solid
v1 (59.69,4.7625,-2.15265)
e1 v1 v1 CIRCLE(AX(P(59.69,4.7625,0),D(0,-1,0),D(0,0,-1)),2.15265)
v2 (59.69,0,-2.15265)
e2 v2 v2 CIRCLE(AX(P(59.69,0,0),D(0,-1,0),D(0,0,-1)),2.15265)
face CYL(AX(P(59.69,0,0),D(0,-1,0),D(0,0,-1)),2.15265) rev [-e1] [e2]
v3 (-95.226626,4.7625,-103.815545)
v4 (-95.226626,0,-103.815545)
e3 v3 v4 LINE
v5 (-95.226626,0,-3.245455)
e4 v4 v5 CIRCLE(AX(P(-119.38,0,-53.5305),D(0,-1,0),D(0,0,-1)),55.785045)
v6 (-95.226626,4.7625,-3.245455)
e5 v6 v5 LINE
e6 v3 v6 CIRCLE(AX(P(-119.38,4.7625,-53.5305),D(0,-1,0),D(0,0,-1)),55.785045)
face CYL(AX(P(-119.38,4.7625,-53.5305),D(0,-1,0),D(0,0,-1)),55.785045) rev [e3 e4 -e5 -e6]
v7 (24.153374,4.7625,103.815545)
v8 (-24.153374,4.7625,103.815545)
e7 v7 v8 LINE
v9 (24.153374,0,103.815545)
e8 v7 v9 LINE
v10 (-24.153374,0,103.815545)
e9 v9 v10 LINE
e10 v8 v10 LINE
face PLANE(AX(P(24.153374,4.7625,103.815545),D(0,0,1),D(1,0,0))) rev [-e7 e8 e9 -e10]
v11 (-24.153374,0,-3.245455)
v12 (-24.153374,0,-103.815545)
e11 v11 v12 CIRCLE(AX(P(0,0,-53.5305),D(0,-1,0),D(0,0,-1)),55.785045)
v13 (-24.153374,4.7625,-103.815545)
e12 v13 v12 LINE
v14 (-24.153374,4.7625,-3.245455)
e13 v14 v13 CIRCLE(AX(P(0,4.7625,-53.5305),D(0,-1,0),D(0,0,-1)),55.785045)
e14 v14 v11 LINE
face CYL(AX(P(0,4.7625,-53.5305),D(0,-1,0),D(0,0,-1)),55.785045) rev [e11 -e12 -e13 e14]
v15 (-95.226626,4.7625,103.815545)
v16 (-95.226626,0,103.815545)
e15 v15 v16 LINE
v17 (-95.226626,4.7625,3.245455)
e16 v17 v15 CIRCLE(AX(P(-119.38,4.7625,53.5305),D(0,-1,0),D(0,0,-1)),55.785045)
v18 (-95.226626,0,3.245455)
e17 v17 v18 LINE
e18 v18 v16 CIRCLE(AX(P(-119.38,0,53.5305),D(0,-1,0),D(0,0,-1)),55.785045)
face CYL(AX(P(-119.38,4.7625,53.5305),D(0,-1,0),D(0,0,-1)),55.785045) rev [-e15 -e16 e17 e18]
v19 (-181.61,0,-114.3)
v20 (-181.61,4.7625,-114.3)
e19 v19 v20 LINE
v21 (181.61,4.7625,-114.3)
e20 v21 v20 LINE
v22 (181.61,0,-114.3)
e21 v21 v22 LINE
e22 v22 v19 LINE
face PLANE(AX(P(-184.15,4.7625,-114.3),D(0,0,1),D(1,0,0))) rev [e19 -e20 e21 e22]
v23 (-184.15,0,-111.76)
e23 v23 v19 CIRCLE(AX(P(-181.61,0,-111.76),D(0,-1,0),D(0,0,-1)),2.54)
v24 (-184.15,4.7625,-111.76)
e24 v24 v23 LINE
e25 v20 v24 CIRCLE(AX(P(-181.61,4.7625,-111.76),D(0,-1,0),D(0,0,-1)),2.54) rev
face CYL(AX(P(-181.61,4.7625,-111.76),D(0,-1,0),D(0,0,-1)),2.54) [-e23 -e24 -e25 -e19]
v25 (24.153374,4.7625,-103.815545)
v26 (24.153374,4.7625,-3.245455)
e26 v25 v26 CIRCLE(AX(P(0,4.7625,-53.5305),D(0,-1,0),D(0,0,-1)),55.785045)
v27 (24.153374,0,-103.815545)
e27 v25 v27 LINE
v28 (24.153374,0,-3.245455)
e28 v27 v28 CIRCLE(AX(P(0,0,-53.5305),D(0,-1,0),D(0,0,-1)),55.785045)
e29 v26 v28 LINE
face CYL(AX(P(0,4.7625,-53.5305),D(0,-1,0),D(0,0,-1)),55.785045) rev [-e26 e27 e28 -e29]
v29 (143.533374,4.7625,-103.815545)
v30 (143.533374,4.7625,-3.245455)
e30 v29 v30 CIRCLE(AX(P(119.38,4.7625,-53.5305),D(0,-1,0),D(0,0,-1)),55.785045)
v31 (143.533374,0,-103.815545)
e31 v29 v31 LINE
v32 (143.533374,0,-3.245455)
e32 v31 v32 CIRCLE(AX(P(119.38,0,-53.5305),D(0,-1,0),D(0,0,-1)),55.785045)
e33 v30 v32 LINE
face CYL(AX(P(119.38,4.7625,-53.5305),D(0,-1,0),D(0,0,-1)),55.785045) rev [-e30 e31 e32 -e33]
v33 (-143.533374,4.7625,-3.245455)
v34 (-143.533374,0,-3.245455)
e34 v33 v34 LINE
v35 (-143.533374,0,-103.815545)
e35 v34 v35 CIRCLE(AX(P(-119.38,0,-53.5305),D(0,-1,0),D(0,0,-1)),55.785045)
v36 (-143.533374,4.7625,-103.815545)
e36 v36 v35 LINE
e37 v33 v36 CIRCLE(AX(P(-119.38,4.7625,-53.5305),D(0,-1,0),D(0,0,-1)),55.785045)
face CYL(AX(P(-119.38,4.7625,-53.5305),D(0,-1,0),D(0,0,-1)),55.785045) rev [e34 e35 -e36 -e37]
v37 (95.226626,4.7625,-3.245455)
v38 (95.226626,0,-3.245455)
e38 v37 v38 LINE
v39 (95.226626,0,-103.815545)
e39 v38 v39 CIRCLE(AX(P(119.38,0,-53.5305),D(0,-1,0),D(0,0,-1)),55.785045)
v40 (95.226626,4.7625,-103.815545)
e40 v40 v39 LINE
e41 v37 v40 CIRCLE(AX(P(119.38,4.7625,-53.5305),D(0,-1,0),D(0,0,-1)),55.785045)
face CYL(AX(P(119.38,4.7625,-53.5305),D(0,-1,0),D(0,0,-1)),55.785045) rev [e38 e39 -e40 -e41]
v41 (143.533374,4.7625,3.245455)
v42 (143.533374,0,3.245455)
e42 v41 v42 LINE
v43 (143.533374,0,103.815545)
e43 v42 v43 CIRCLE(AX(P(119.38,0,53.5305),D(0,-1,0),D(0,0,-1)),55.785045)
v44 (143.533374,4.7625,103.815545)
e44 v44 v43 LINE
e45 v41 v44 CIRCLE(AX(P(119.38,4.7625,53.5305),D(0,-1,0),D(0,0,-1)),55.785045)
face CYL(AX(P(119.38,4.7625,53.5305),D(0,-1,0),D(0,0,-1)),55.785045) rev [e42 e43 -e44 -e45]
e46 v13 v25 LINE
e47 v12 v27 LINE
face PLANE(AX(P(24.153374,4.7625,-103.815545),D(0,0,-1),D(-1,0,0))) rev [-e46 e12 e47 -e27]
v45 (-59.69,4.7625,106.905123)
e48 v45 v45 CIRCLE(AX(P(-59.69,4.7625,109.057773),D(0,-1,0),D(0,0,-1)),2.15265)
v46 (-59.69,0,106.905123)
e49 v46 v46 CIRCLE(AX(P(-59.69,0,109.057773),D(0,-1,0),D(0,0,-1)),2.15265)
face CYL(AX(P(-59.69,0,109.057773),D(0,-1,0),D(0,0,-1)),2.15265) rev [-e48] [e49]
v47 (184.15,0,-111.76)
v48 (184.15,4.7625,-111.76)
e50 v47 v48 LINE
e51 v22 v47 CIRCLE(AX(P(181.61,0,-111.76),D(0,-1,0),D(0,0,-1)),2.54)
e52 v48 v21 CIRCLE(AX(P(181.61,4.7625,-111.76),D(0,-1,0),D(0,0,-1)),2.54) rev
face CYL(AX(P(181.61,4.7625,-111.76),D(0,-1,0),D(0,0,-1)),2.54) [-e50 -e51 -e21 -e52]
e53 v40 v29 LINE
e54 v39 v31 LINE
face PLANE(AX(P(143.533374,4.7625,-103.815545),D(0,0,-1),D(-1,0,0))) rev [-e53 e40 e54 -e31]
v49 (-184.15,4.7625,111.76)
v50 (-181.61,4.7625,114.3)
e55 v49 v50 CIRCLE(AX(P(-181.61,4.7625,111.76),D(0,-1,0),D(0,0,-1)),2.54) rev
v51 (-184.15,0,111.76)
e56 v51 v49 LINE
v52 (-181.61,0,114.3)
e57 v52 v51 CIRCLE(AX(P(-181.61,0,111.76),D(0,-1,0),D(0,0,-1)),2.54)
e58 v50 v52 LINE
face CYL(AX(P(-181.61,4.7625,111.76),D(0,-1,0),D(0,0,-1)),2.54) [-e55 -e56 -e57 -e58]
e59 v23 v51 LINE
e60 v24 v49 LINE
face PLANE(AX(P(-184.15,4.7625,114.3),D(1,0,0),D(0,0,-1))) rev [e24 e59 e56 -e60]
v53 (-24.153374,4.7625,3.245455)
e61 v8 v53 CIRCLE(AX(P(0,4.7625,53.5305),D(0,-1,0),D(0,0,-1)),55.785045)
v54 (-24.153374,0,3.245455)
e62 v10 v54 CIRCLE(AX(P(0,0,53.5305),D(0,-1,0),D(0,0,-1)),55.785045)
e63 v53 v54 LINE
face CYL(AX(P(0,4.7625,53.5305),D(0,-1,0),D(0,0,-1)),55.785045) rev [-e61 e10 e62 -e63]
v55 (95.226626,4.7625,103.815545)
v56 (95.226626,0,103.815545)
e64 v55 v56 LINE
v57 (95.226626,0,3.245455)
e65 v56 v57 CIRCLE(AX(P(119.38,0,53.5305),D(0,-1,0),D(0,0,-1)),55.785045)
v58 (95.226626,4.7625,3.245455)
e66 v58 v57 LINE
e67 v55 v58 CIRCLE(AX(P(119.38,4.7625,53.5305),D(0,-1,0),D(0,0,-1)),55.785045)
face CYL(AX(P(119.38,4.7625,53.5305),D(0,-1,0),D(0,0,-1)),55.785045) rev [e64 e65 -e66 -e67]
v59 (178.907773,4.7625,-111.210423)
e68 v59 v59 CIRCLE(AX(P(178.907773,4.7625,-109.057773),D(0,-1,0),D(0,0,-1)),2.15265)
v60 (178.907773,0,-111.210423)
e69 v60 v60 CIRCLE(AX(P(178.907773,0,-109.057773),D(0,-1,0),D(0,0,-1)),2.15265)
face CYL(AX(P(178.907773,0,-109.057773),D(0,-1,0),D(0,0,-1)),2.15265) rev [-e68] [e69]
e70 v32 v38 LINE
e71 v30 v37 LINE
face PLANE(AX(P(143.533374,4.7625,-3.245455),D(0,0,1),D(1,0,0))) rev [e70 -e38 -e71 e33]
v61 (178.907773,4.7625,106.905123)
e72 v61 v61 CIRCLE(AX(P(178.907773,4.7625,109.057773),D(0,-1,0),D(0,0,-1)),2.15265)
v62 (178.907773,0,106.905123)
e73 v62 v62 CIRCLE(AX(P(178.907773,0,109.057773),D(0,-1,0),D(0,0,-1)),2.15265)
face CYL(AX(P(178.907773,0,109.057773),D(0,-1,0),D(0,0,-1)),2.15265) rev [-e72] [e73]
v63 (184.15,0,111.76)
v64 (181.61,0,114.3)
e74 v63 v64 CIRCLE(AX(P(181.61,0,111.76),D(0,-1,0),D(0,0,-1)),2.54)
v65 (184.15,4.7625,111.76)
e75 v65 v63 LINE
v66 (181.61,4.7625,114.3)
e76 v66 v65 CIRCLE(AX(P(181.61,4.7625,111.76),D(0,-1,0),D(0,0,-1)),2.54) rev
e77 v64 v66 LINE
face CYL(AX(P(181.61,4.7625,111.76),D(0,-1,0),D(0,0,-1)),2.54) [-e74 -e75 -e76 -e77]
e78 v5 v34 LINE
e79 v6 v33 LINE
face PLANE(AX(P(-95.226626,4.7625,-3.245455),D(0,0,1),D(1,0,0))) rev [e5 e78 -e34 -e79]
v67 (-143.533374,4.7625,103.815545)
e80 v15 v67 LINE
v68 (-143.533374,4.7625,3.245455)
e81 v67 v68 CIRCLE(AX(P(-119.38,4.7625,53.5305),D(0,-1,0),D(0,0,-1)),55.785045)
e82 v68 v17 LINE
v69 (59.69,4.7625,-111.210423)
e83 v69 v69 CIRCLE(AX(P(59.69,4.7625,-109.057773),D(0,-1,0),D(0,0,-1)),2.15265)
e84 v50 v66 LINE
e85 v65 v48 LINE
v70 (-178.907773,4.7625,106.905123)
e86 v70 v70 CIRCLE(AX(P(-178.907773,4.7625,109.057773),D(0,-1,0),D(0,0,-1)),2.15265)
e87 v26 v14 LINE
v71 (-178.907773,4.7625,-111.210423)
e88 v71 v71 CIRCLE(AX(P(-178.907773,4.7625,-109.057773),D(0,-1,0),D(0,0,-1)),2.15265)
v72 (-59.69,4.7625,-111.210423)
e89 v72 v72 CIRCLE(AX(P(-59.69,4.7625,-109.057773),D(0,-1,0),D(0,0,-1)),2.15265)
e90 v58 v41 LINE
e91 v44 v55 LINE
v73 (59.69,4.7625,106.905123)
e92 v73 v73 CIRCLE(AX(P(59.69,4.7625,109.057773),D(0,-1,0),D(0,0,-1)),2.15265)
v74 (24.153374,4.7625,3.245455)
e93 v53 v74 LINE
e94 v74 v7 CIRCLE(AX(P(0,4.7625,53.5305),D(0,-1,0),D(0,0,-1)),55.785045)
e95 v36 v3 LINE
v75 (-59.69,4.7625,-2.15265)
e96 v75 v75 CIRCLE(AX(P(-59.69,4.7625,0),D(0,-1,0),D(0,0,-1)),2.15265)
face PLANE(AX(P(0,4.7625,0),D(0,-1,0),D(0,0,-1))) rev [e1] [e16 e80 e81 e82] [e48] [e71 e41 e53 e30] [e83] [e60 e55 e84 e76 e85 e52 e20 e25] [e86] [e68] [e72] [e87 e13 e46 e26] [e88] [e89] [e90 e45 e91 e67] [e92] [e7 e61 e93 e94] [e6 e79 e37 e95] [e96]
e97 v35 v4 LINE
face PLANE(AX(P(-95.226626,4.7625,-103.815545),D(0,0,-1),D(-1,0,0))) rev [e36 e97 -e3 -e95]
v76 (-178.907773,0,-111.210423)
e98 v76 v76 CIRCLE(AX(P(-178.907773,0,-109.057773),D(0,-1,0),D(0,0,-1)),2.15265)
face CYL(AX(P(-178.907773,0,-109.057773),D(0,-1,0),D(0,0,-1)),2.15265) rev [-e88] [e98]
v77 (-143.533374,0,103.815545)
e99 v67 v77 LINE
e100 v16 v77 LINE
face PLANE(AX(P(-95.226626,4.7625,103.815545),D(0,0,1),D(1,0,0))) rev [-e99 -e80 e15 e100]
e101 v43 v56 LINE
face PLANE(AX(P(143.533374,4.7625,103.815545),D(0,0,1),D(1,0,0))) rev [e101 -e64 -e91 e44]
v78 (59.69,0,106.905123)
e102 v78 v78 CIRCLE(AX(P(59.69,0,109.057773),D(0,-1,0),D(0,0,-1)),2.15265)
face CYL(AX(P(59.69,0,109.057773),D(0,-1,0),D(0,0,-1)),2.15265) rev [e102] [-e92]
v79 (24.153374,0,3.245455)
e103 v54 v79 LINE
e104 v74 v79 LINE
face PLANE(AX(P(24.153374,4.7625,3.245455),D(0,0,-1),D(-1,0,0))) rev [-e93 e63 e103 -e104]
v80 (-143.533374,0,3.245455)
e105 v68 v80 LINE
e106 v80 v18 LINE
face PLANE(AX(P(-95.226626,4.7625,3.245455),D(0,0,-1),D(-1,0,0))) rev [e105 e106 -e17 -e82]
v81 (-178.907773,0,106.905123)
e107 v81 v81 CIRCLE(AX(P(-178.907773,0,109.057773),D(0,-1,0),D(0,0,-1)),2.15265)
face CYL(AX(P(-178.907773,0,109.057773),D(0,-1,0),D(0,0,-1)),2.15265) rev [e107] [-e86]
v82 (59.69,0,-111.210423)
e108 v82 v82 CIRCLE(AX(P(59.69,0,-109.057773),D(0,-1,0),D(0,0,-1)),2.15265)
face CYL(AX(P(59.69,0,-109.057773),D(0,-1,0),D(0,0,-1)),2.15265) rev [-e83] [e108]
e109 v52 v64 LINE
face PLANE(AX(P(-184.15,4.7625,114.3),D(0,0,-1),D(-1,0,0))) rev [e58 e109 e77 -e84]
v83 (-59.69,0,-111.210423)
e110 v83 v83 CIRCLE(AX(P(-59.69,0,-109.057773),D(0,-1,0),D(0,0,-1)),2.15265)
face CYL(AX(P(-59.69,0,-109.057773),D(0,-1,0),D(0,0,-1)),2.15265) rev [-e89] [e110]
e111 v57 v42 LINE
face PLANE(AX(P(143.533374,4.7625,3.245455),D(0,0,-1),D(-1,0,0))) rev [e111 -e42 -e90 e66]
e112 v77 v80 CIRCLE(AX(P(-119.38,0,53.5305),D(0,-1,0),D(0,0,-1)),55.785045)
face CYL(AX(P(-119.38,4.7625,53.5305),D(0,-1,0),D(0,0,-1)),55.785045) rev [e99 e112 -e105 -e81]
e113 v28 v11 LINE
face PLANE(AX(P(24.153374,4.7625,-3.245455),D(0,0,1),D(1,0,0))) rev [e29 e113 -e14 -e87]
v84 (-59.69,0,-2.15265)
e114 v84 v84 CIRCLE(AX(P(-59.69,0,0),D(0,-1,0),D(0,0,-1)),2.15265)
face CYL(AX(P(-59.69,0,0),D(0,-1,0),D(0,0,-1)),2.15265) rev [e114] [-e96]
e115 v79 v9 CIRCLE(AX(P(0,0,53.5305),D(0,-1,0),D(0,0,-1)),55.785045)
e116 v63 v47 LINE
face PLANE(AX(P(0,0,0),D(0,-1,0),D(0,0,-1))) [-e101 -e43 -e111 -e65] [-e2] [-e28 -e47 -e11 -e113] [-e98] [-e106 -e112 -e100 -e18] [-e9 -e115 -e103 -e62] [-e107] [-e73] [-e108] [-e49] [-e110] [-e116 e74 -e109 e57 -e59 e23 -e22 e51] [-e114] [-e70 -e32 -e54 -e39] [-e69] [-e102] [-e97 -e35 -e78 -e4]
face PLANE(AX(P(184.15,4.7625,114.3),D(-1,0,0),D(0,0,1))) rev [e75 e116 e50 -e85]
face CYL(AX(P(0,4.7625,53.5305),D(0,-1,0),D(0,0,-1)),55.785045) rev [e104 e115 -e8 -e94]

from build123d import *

# Parameters (mm, degrees)
SKETCH1_W             = 368.3
SKETCH1_H             = 228.6
BOSS_EXTRUDE1_DEPTH   = 4.7625
CUT_EXTRUDE1_DEPTH    = 217.791129676
SKETCH_PATTERN1_DEPTH = 4.7625
FILLET1_R             = 2.54
F_8_CLEARANCE_HOLE1_D = 4.3053


# Read off the part's stored shape, not the designer's step: Sketch-Pattern1
with BuildPart() as part:
    # Sketch1 → Boss-Extrude1 (new body)
    with BuildSketch(Plane(origin=(0, 0, 0), x_dir=(1, 0, 0), z_dir=(0, 1, 0))):
        Rectangle(SKETCH1_W, SKETCH1_H)
    extrude(amount=BOSS_EXTRUDE1_DEPTH)

    # Sketch3 → Cut-Extrude1 (cut, through all)
    with BuildSketch(Plane.XZ):
        with BuildLine():
            Line((143.533374481, -3.245454654), (95.226625519, -3.245454654))
            ThreePointArc((95.226625519, -3.245454654), (63.594954654, -53.5305), (95.226625519, -103.815545346))
            Line((95.226625519, -103.815545346), (143.533374481, -103.815545346))
            ThreePointArc((143.533374481, -103.815545346), (175.165045346, -53.5305), (143.533374481, -3.245454654))
        make_face()
    extrude(amount=-CUT_EXTRUDE1_DEPTH, mode=Mode.SUBTRACT)

    # Sketch-Pattern1 outline → Sketch-Pattern1 (cut)
    with BuildSketch(Plane(origin=(0, 0, 0), x_dir=(1, 0, 0), z_dir=(0, 1, 0))):
        with BuildLine():
            ThreePointArc((-24.153374481, 103.815545346), (-55.785045346, 53.5305), (-24.153374481, 3.245454654))
            Line((-24.153374481, 3.245454654), (24.153374481, 3.245454654))
            ThreePointArc((24.153374481, 3.245454654), (55.785045346, 53.5305), (24.153374481, 103.815545346))
            Line((24.153374481, 103.815545346), (-24.153374481, 103.815545346))
        make_face()
        with BuildLine():
            ThreePointArc((-143.533374481, 103.815545346), (-175.165045346, 53.5305), (-143.533374481, 3.245454654))
            Line((-143.533374481, 3.245454654), (-95.226625519, 3.245454654))
            ThreePointArc((-95.226625519, 3.245454654), (-63.594954654, 53.5305), (-95.226625519, 103.815545346))
            Line((-95.226625519, 103.815545346), (-143.533374481, 103.815545346))
        make_face()
        with BuildLine():
            ThreePointArc((95.226625519, -3.245454654), (63.594954654, -53.5305), (95.226625519, -103.815545346))
            Line((95.226625519, -103.815545346), (143.533374481, -103.815545346))
            ThreePointArc((143.533374481, -103.815545346), (175.165045346, -53.5305), (143.533374481, -3.245454654))
            Line((143.533374481, -3.245454654), (95.226625519, -3.245454654))
        make_face()
        with BuildLine():
            ThreePointArc((-24.153374481, -3.245454654), (-55.785045346, -53.5305), (-24.153374481, -103.815545346))
            Line((-24.153374481, -103.815545346), (24.153374481, -103.815545346))
            ThreePointArc((24.153374481, -103.815545346), (55.785045346, -53.5305), (24.153374481, -3.245454654))
            Line((24.153374481, -3.245454654), (-24.153374481, -3.245454654))
        make_face()
        with BuildLine():
            ThreePointArc((-143.533374481, -3.245454654), (-175.165045346, -53.5305), (-143.533374481, -103.815545346))
            Line((-143.533374481, -103.815545346), (-95.226625519, -103.815545346))
            ThreePointArc((-95.226625519, -103.815545346), (-63.594954654, -53.5305), (-95.226625519, -3.245454654))
            Line((-95.226625519, -3.245454654), (-143.533374481, -3.245454654))
        make_face()
    extrude(amount=SKETCH_PATTERN1_DEPTH, mode=Mode.SUBTRACT)

    # Fillet1
    fillet1_edges = [part.edges().sort_by_distance(p)[0] for p in [
        (184.15, 2.38125, 114.3),
        (-184.15, 2.38125, 114.3),
        (-184.15, 2.38125, -114.3),
        (184.15, 2.38125, -114.3),
    ]]
    fillet(fillet1_edges, radius=FILLET1_R)

    # #8 Clearance Hole1 (through all)
    with Locations(Plane(origin=(0, 0, 0), x_dir=(-1, 0, 0), z_dir=(0, -1, 0))):
        with Locations((-178.907772673, 109.057772673), (-59.69, 109.057772673), (59.69, 109.057772673), (178.907772673, 109.057772673), (178.907772673, -109.057772673), (59.69, -109.057772673), (-59.69, -109.057772673), (-178.907772673, -109.057772673), (59.69, 0), (-59.69, 0)):
            Hole(F_8_CLEARANCE_HOLE1_D / 2)


solid = part.part
